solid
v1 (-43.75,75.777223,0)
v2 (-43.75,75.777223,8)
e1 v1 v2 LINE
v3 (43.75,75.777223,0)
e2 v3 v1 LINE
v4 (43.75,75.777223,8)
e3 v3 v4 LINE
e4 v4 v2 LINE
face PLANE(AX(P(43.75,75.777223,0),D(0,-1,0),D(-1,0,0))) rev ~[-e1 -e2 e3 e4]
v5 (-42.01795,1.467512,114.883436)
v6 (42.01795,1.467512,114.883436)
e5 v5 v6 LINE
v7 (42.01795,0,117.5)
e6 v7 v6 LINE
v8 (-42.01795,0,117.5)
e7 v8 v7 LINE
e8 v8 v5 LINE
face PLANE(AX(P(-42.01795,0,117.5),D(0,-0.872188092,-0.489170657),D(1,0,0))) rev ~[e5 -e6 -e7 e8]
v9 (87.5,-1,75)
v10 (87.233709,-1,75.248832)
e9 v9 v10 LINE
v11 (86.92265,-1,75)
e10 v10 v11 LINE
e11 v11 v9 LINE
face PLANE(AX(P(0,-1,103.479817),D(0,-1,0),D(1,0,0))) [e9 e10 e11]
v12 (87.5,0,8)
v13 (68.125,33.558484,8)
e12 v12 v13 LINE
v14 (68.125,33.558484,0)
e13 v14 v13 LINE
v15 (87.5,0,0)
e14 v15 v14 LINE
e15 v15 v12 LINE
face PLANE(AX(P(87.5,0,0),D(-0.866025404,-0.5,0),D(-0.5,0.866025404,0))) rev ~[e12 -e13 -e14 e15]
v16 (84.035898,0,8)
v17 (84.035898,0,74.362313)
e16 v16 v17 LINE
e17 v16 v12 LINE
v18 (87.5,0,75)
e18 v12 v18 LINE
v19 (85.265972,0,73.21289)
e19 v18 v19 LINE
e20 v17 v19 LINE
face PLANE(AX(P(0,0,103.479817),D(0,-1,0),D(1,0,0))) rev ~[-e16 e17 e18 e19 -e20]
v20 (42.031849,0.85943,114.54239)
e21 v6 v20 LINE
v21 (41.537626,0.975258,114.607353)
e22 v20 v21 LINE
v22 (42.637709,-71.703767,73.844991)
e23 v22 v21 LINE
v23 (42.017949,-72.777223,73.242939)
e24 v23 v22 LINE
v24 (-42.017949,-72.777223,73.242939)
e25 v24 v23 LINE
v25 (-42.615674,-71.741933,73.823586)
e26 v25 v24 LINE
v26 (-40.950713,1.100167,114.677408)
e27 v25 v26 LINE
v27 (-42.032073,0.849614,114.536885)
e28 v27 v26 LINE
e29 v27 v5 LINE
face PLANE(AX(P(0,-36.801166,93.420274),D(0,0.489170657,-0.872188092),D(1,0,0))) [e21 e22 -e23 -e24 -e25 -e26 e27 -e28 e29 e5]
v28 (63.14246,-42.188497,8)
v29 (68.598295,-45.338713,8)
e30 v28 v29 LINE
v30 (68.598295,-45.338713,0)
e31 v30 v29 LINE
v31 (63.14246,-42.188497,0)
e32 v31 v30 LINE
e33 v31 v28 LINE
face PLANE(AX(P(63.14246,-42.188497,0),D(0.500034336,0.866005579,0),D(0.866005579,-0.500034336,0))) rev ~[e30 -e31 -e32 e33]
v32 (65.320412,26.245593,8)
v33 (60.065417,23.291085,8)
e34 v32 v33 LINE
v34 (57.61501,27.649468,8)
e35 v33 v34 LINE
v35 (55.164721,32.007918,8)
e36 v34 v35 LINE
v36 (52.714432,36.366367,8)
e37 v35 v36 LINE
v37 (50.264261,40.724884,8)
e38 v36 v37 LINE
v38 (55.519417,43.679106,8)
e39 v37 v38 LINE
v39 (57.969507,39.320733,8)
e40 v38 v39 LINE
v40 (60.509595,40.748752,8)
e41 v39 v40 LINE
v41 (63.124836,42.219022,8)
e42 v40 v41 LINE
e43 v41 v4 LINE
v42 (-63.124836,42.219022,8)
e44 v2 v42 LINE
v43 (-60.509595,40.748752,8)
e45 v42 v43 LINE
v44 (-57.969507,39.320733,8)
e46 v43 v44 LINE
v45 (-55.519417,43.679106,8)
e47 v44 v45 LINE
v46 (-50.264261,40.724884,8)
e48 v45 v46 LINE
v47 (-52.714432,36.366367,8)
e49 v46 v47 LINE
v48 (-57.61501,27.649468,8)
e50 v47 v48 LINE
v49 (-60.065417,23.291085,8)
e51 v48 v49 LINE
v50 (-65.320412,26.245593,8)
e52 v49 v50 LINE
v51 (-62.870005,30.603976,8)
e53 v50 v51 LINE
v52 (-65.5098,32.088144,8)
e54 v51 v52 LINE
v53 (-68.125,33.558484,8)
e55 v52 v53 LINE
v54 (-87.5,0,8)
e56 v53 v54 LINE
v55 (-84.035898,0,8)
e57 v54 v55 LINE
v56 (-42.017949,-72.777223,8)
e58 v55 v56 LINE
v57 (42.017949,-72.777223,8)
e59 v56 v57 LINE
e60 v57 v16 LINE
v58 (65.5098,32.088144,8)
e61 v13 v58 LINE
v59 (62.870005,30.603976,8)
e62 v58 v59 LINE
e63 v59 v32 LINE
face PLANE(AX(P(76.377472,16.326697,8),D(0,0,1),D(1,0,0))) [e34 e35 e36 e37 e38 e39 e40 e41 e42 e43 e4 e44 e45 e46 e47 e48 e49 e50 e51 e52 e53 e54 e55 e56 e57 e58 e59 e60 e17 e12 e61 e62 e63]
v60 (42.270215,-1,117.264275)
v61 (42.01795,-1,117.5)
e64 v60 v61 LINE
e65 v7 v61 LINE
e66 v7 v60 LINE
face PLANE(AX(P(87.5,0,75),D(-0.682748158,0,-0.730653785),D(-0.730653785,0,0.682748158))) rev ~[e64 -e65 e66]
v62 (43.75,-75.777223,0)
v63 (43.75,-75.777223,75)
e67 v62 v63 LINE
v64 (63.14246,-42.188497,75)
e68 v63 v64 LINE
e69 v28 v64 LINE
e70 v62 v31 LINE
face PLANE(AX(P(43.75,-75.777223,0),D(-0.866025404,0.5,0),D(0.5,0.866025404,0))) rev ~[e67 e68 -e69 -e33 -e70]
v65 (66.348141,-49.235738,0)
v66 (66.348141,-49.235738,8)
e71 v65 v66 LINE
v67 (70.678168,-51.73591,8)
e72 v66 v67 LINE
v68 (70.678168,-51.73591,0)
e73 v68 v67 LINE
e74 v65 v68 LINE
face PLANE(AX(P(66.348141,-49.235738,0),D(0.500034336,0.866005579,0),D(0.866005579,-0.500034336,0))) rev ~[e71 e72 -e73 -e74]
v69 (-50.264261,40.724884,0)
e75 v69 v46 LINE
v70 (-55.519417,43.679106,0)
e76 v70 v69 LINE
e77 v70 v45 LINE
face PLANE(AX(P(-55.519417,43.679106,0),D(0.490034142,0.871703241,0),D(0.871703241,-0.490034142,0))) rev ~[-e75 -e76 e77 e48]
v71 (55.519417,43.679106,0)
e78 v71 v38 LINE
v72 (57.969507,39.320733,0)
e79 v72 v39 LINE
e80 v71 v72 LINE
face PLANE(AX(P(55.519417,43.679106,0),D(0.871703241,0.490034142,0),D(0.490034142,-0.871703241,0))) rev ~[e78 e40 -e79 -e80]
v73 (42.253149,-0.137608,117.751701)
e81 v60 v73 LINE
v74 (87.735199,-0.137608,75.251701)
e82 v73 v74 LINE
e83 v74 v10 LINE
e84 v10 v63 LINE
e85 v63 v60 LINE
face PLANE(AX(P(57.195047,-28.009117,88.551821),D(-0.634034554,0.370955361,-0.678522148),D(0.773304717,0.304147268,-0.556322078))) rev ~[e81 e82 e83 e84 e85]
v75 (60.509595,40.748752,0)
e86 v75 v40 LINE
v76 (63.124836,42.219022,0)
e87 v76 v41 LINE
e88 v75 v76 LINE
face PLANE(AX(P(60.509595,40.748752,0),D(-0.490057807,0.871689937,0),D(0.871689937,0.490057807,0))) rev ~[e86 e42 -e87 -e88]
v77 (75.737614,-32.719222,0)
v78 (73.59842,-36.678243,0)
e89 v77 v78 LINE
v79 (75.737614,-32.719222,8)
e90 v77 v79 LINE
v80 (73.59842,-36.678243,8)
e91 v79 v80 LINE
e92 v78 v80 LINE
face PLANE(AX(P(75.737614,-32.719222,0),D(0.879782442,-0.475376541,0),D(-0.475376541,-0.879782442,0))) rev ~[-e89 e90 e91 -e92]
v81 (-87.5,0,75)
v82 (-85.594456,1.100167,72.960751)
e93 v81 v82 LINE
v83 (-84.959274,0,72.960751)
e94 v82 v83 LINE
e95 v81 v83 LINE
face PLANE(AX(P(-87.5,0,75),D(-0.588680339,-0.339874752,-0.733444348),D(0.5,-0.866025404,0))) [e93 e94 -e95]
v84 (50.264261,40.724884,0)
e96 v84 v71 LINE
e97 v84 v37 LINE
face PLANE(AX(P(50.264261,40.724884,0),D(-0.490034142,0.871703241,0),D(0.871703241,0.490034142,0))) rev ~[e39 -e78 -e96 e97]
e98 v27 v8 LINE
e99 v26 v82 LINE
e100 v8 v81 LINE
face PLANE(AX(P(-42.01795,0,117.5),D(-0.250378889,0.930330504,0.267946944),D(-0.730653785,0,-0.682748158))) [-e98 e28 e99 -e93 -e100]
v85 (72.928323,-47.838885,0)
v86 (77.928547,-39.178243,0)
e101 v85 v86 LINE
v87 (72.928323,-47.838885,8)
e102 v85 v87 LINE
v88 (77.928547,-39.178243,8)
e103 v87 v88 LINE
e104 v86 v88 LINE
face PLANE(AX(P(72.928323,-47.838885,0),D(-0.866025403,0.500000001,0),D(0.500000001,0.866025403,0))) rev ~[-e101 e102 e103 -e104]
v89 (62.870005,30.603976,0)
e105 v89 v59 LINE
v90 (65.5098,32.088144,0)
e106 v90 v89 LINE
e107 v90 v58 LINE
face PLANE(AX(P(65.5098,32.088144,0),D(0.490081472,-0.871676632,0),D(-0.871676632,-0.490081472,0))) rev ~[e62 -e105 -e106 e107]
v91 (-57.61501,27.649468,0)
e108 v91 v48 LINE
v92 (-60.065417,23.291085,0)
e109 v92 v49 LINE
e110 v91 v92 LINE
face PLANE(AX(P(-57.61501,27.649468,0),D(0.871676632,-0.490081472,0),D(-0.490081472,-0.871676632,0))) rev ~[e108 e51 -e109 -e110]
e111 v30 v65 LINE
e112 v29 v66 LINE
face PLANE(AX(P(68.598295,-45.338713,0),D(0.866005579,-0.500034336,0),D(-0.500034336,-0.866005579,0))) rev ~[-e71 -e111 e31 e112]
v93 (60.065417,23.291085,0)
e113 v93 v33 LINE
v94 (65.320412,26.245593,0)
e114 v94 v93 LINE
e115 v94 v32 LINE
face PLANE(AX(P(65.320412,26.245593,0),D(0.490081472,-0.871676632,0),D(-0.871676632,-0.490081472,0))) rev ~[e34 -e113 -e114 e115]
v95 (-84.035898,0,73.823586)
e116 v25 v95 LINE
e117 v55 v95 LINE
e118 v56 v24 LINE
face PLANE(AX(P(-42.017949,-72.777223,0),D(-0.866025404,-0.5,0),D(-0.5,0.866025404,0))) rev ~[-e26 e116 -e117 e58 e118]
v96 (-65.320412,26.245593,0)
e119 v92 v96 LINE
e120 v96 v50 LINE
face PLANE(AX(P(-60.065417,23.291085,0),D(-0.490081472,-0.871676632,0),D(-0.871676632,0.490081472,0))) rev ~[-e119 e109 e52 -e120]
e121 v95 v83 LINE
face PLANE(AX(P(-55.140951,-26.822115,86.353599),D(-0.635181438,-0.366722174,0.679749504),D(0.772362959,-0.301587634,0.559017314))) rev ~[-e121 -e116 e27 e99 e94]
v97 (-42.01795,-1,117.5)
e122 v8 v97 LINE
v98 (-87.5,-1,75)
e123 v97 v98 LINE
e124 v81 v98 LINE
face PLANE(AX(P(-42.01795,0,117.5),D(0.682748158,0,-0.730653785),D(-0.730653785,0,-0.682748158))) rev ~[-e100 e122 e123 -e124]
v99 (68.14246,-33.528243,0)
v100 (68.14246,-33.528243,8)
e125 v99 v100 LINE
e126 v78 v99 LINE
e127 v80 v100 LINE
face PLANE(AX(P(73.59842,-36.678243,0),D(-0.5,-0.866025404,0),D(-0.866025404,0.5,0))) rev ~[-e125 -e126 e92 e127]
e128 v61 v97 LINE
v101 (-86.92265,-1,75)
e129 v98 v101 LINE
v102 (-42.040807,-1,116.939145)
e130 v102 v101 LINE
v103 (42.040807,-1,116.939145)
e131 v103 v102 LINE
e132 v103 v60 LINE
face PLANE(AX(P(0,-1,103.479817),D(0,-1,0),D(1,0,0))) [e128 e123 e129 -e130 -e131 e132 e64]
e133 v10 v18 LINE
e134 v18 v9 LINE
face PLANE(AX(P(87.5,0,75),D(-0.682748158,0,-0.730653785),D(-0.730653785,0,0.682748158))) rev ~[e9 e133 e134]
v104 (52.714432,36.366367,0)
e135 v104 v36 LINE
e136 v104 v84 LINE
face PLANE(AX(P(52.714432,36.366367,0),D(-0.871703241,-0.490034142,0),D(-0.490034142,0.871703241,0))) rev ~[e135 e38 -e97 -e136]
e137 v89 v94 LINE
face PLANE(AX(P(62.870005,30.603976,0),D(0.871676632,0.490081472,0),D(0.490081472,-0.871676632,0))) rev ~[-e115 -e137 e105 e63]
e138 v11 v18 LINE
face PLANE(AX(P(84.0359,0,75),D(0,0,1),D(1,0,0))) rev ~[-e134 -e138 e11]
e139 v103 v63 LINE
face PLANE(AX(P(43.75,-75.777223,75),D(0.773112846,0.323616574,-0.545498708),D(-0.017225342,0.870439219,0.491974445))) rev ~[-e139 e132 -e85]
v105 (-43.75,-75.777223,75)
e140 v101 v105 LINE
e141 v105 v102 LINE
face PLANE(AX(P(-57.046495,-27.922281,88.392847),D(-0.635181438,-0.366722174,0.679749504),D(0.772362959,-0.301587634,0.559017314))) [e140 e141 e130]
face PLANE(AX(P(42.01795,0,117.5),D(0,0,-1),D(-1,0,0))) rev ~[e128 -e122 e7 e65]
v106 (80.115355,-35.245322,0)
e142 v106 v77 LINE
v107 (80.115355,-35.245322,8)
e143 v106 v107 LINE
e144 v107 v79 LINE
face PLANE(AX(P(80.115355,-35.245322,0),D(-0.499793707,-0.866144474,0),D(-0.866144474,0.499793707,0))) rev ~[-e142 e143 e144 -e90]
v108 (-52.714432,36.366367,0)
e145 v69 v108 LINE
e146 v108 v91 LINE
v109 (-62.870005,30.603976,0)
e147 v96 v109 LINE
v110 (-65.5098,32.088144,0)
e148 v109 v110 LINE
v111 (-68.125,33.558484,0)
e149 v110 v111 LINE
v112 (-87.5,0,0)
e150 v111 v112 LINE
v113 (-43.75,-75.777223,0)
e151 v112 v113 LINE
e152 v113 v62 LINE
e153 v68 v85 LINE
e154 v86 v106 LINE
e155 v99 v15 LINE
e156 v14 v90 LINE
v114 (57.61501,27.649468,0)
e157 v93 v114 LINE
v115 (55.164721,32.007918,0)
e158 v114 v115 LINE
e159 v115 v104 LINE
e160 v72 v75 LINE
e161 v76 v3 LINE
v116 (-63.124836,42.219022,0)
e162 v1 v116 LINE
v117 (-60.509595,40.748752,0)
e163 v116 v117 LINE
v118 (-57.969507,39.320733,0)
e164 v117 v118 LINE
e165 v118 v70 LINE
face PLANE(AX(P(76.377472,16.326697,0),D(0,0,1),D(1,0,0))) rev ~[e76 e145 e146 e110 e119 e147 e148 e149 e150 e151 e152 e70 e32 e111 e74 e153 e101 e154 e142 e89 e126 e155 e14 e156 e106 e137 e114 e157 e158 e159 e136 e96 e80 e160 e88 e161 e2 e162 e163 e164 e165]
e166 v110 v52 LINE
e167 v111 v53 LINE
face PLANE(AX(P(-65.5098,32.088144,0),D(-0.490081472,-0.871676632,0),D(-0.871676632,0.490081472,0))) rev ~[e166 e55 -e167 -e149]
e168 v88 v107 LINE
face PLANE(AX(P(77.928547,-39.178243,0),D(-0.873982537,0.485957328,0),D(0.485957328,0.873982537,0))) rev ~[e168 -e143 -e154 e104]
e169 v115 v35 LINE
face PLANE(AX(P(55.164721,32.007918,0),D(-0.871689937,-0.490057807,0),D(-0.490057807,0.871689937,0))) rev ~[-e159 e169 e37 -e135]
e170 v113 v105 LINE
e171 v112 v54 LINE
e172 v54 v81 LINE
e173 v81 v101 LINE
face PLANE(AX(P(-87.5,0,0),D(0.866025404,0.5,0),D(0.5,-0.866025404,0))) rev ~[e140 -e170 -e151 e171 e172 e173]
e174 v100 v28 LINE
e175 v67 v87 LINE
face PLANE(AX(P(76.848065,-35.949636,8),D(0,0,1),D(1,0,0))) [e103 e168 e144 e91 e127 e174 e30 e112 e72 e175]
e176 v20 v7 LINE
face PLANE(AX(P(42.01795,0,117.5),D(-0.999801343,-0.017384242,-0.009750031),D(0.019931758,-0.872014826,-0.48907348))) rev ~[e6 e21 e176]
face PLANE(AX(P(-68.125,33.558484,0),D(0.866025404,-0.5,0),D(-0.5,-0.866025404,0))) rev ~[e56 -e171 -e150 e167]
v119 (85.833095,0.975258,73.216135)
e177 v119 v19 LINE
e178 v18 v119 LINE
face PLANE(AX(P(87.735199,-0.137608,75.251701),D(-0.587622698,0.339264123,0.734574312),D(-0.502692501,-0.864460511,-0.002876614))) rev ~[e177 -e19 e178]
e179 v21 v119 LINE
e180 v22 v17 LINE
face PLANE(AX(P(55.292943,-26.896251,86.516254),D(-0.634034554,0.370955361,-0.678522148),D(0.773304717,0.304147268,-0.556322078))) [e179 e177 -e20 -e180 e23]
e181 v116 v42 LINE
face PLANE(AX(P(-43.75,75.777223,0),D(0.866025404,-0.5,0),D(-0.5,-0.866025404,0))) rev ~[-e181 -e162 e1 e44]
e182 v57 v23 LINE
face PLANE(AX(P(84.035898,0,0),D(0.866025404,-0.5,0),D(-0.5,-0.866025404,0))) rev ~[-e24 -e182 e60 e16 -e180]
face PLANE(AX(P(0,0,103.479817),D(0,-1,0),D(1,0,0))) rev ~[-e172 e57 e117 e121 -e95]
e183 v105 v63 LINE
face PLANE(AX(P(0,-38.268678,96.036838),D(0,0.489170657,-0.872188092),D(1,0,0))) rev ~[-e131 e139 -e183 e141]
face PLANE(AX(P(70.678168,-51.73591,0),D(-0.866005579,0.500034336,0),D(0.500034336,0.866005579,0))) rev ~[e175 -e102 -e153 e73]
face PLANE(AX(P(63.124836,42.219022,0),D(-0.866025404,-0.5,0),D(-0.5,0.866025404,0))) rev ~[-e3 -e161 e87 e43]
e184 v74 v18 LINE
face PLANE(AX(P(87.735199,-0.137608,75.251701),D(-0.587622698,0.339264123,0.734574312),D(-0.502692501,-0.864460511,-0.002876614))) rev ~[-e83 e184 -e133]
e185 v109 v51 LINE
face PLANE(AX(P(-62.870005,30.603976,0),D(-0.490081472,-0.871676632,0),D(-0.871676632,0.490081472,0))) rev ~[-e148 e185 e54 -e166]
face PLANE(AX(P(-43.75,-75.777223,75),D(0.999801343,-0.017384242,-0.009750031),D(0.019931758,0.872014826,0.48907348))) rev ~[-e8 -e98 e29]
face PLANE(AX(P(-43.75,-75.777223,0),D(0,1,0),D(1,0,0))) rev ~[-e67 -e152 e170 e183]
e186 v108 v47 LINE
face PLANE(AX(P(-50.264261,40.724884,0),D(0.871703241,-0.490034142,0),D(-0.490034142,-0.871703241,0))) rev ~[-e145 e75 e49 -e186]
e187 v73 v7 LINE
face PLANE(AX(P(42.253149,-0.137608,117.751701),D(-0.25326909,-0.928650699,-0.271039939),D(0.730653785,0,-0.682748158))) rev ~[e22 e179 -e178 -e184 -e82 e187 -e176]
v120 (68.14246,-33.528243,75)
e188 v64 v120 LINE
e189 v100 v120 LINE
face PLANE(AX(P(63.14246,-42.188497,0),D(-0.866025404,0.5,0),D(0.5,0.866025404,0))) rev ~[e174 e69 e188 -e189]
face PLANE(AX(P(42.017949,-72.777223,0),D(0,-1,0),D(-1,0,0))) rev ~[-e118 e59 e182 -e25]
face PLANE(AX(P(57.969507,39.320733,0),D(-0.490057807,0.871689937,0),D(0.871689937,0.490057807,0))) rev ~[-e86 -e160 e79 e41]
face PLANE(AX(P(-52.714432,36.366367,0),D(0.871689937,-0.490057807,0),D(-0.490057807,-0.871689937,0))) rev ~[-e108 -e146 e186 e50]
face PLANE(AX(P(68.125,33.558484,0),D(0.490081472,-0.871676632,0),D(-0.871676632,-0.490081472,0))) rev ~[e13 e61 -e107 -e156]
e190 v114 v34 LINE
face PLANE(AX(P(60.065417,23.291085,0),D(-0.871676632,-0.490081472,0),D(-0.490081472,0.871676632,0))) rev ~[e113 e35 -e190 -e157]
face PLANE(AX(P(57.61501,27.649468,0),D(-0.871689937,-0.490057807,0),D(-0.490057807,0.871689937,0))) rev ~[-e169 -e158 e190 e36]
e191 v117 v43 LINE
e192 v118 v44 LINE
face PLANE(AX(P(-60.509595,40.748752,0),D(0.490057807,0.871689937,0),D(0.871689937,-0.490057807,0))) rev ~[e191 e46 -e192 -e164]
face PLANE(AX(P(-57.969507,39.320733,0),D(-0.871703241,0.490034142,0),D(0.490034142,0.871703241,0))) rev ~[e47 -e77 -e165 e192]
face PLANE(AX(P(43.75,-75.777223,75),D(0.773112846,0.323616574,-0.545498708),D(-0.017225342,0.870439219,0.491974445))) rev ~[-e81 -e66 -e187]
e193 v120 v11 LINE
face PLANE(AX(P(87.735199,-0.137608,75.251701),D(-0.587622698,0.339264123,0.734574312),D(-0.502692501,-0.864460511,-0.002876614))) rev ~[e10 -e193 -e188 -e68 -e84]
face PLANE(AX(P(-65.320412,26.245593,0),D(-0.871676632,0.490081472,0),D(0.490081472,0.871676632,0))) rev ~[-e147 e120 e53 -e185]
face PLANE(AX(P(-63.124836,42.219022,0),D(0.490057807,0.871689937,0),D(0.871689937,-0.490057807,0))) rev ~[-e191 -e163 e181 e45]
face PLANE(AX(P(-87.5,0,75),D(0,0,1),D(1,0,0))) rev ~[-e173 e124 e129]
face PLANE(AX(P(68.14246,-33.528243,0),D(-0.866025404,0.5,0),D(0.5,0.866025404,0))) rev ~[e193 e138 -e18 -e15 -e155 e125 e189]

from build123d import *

# Parameters (mm, degrees)
F0_W      = 50
F0_H      = 12.5
F1_DEPTH  = 8
F2_DEPTH  = 75
F4_DEPTH  = 8
F7_DEPTH  = 3
F8_DEPTH  = 1
F11_DEPTH = 3
F14_DEPTH = 3
F15_DEPTH = 8
F16_DEPTH = 8
F17_DEPTH = 8
F18_DEPTH = 8


# Not quite as in the source:
# - a feature names something its author has since deleted; it is built from what else it names


with BuildPart() as f1:
    # F0 (on Top) → F1 (new body)
    with BuildSketch(Plane.XY):
        Polygon((-42.0179491924, 72.7772228311), (-60.5095952989, 40.7487522591), (-57.9695070384, 39.3207329262), (-55.5194165334, 43.6791064608), (-50.2642610162, 40.7248836223), (-52.7144317239, 36.366367418), (-57.615009792, 27.6494680496), (-60.0654171506, 23.2910848888), (-65.3204122546, 26.2455930623), (-62.870004896, 30.6039762231), (-65.5097997054, 32.0881441788), (-84.0358983849, 0), (-42.0179491924, -72.7772228311), (42.0179491924, -72.7772228311), (84.0358983849, 0), (65.5097997054, 32.0881441788), (62.870004896, 30.6039762231), (65.3204122546, 26.2455930623), (60.0654171506, 23.2910848888), (57.615009792, 27.6494680496), (55.164720758, 32.0079177338), (52.7144317239, 36.366367418), (50.2642610162, 40.7248836223), (55.5194165334, 43.6791064608), (57.9695070384, 39.3207329262), (60.5095952989, 40.7487522591), (42.0179491924, 72.7772228311), align=None)
        with Locations((0, 54.5829171234)):
            Rectangle(F0_W, F0_H, mode=Mode.SUBTRACT)
    extrude(amount=F1_DEPTH)

    # F0 (on Top) → F2 (join)
    with BuildSketch(Plane.XY):
        Polygon((68.1424599038, -33.5282429562), (87.5, 0), (84.0358983849, 0), (42.0179491924, -72.7772228311), (-42.0179491924, -72.7772228311), (-84.0358983849, 0), (-87.5, 0), (-43.75, -75.7772228311), (43.75, -75.7772228311), (63.1424599038, -42.188496994), align=None)
    extrude(amount=F2_DEPTH)

    # F0 (on Top) → F4 (join)
    with BuildSketch(Plane.XY):
        Polygon((43.75, 75.7772228311), (-43.75, 75.7772228311), (-63.1248363216, 42.2190219338), (-60.5095952989, 40.7487522591), (-42.0179491924, 72.7772228311), (42.0179491924, 72.7772228311), (60.5095952989, 40.7487522591), (63.1248363216, 42.2190219338), align=None)
    extrude(amount=F4_DEPTH)

    # F6 (on face) → F7 (join)
    with BuildSketch(Plane(origin=(0, -50.1312366318, 89.3836679776), x_dir=(1, 0, 0), z_dir=(0, 0.4891706574, -0.872188092))):
        Polygon((43.75, 29.4041920927), (0, 29.4041920927), (-43.75, 29.4041920927), (-42.01795, -57.4775522498), (42.01795, -57.4775522498), align=None)
    extrude(amount=F7_DEPTH)

    # F3 (on Front) → F8 (join)
    with BuildSketch(Plane.XZ):
        Polygon((-42.01795, 114.5), (0, 114.5), (42.01795, 114.5), (84.0359, 75), (87.5, 75), (42.01795, 117.5), (0, 117.5), (-42.01795, 117.5), (-87.5, 75), (-84.0359, 75), align=None)
    extrude(amount=F8_DEPTH)

    # F10 (on face) → F11 (join)
    with BuildSketch(Plane(origin=(-67.6846727043, -39.0777640058, 72.4338274863), x_dir=(0.7723629594, -0.3015876344, 0.5590173143), z_dir=(-0.6351814378, -0.3667221741, 0.6797495039))):
        Polygon((33.2314262259, 55.789645187), (-25.6554603702, 35.6104118215), (30.9888924807, -31.0804218073), align=None)
    extrude(amount=-F11_DEPTH)

    # F13 (on face) → F14 (join)
    with BuildSketch(Plane(origin=(67.6756688636, -39.5950852503, 72.4241918832), x_dir=(0.7733047167, 0.3041472681, -0.556322078), z_dir=(-0.6340345536, 0.3709553614, -0.6785221475))):
        Polygon((-30.939509805, 30.5117392321), (-32.8751652468, -56.3649154418), (25.9400068576, -35.9776056011), align=None)
    extrude(amount=F14_DEPTH)

    # F0 (on Top) → F15 (join)
    with BuildSketch(Plane.XY):
        with Locations((0, 54.5829171234)):
            Rectangle(F0_W, F0_H)
    extrude(amount=F15_DEPTH)

    # F0 (on Top) → F16 (join)
    with BuildSketch(Plane.XY):
        Polygon((75.7376143812, -32.7192219692), (73.5984199476, -36.6782429562), (77.9285469666, -39.1782429562), (80.1153549422, -35.2453215385), align=None)
        Polygon((73.5984199476, -36.6782429562), (68.1424599038, -33.5282429562), (63.1424599038, -42.188496994), (68.5982950526, -45.3387133087), (72.9283229484, -47.838884987), (77.9285469666, -39.1782429562), align=None)
        Polygon((72.9283229484, -47.838884987), (68.5982950526, -45.3387133087), (66.3481405421, -49.235738415), (70.6781684379, -51.7359100933), align=None)
    extrude(amount=F16_DEPTH)

    # F0 (on Top) → F17 (join)
    with BuildSketch(Plane.XY):
        Polygon((-65.5097997054, 32.0881441788), (-68.125, 33.5584843966), (-87.5, 0), (-84.0358983849, 0), align=None)
    extrude(amount=F17_DEPTH)

    # F0 (on Top) → F18 (join)
    with BuildSketch(Plane.XY):
        Polygon((87.5, 0), (68.125, 33.5584843966), (65.5097997054, 32.0881441788), (84.0358983849, 0), align=None)
    extrude(amount=F18_DEPTH)


solid = f1.part
